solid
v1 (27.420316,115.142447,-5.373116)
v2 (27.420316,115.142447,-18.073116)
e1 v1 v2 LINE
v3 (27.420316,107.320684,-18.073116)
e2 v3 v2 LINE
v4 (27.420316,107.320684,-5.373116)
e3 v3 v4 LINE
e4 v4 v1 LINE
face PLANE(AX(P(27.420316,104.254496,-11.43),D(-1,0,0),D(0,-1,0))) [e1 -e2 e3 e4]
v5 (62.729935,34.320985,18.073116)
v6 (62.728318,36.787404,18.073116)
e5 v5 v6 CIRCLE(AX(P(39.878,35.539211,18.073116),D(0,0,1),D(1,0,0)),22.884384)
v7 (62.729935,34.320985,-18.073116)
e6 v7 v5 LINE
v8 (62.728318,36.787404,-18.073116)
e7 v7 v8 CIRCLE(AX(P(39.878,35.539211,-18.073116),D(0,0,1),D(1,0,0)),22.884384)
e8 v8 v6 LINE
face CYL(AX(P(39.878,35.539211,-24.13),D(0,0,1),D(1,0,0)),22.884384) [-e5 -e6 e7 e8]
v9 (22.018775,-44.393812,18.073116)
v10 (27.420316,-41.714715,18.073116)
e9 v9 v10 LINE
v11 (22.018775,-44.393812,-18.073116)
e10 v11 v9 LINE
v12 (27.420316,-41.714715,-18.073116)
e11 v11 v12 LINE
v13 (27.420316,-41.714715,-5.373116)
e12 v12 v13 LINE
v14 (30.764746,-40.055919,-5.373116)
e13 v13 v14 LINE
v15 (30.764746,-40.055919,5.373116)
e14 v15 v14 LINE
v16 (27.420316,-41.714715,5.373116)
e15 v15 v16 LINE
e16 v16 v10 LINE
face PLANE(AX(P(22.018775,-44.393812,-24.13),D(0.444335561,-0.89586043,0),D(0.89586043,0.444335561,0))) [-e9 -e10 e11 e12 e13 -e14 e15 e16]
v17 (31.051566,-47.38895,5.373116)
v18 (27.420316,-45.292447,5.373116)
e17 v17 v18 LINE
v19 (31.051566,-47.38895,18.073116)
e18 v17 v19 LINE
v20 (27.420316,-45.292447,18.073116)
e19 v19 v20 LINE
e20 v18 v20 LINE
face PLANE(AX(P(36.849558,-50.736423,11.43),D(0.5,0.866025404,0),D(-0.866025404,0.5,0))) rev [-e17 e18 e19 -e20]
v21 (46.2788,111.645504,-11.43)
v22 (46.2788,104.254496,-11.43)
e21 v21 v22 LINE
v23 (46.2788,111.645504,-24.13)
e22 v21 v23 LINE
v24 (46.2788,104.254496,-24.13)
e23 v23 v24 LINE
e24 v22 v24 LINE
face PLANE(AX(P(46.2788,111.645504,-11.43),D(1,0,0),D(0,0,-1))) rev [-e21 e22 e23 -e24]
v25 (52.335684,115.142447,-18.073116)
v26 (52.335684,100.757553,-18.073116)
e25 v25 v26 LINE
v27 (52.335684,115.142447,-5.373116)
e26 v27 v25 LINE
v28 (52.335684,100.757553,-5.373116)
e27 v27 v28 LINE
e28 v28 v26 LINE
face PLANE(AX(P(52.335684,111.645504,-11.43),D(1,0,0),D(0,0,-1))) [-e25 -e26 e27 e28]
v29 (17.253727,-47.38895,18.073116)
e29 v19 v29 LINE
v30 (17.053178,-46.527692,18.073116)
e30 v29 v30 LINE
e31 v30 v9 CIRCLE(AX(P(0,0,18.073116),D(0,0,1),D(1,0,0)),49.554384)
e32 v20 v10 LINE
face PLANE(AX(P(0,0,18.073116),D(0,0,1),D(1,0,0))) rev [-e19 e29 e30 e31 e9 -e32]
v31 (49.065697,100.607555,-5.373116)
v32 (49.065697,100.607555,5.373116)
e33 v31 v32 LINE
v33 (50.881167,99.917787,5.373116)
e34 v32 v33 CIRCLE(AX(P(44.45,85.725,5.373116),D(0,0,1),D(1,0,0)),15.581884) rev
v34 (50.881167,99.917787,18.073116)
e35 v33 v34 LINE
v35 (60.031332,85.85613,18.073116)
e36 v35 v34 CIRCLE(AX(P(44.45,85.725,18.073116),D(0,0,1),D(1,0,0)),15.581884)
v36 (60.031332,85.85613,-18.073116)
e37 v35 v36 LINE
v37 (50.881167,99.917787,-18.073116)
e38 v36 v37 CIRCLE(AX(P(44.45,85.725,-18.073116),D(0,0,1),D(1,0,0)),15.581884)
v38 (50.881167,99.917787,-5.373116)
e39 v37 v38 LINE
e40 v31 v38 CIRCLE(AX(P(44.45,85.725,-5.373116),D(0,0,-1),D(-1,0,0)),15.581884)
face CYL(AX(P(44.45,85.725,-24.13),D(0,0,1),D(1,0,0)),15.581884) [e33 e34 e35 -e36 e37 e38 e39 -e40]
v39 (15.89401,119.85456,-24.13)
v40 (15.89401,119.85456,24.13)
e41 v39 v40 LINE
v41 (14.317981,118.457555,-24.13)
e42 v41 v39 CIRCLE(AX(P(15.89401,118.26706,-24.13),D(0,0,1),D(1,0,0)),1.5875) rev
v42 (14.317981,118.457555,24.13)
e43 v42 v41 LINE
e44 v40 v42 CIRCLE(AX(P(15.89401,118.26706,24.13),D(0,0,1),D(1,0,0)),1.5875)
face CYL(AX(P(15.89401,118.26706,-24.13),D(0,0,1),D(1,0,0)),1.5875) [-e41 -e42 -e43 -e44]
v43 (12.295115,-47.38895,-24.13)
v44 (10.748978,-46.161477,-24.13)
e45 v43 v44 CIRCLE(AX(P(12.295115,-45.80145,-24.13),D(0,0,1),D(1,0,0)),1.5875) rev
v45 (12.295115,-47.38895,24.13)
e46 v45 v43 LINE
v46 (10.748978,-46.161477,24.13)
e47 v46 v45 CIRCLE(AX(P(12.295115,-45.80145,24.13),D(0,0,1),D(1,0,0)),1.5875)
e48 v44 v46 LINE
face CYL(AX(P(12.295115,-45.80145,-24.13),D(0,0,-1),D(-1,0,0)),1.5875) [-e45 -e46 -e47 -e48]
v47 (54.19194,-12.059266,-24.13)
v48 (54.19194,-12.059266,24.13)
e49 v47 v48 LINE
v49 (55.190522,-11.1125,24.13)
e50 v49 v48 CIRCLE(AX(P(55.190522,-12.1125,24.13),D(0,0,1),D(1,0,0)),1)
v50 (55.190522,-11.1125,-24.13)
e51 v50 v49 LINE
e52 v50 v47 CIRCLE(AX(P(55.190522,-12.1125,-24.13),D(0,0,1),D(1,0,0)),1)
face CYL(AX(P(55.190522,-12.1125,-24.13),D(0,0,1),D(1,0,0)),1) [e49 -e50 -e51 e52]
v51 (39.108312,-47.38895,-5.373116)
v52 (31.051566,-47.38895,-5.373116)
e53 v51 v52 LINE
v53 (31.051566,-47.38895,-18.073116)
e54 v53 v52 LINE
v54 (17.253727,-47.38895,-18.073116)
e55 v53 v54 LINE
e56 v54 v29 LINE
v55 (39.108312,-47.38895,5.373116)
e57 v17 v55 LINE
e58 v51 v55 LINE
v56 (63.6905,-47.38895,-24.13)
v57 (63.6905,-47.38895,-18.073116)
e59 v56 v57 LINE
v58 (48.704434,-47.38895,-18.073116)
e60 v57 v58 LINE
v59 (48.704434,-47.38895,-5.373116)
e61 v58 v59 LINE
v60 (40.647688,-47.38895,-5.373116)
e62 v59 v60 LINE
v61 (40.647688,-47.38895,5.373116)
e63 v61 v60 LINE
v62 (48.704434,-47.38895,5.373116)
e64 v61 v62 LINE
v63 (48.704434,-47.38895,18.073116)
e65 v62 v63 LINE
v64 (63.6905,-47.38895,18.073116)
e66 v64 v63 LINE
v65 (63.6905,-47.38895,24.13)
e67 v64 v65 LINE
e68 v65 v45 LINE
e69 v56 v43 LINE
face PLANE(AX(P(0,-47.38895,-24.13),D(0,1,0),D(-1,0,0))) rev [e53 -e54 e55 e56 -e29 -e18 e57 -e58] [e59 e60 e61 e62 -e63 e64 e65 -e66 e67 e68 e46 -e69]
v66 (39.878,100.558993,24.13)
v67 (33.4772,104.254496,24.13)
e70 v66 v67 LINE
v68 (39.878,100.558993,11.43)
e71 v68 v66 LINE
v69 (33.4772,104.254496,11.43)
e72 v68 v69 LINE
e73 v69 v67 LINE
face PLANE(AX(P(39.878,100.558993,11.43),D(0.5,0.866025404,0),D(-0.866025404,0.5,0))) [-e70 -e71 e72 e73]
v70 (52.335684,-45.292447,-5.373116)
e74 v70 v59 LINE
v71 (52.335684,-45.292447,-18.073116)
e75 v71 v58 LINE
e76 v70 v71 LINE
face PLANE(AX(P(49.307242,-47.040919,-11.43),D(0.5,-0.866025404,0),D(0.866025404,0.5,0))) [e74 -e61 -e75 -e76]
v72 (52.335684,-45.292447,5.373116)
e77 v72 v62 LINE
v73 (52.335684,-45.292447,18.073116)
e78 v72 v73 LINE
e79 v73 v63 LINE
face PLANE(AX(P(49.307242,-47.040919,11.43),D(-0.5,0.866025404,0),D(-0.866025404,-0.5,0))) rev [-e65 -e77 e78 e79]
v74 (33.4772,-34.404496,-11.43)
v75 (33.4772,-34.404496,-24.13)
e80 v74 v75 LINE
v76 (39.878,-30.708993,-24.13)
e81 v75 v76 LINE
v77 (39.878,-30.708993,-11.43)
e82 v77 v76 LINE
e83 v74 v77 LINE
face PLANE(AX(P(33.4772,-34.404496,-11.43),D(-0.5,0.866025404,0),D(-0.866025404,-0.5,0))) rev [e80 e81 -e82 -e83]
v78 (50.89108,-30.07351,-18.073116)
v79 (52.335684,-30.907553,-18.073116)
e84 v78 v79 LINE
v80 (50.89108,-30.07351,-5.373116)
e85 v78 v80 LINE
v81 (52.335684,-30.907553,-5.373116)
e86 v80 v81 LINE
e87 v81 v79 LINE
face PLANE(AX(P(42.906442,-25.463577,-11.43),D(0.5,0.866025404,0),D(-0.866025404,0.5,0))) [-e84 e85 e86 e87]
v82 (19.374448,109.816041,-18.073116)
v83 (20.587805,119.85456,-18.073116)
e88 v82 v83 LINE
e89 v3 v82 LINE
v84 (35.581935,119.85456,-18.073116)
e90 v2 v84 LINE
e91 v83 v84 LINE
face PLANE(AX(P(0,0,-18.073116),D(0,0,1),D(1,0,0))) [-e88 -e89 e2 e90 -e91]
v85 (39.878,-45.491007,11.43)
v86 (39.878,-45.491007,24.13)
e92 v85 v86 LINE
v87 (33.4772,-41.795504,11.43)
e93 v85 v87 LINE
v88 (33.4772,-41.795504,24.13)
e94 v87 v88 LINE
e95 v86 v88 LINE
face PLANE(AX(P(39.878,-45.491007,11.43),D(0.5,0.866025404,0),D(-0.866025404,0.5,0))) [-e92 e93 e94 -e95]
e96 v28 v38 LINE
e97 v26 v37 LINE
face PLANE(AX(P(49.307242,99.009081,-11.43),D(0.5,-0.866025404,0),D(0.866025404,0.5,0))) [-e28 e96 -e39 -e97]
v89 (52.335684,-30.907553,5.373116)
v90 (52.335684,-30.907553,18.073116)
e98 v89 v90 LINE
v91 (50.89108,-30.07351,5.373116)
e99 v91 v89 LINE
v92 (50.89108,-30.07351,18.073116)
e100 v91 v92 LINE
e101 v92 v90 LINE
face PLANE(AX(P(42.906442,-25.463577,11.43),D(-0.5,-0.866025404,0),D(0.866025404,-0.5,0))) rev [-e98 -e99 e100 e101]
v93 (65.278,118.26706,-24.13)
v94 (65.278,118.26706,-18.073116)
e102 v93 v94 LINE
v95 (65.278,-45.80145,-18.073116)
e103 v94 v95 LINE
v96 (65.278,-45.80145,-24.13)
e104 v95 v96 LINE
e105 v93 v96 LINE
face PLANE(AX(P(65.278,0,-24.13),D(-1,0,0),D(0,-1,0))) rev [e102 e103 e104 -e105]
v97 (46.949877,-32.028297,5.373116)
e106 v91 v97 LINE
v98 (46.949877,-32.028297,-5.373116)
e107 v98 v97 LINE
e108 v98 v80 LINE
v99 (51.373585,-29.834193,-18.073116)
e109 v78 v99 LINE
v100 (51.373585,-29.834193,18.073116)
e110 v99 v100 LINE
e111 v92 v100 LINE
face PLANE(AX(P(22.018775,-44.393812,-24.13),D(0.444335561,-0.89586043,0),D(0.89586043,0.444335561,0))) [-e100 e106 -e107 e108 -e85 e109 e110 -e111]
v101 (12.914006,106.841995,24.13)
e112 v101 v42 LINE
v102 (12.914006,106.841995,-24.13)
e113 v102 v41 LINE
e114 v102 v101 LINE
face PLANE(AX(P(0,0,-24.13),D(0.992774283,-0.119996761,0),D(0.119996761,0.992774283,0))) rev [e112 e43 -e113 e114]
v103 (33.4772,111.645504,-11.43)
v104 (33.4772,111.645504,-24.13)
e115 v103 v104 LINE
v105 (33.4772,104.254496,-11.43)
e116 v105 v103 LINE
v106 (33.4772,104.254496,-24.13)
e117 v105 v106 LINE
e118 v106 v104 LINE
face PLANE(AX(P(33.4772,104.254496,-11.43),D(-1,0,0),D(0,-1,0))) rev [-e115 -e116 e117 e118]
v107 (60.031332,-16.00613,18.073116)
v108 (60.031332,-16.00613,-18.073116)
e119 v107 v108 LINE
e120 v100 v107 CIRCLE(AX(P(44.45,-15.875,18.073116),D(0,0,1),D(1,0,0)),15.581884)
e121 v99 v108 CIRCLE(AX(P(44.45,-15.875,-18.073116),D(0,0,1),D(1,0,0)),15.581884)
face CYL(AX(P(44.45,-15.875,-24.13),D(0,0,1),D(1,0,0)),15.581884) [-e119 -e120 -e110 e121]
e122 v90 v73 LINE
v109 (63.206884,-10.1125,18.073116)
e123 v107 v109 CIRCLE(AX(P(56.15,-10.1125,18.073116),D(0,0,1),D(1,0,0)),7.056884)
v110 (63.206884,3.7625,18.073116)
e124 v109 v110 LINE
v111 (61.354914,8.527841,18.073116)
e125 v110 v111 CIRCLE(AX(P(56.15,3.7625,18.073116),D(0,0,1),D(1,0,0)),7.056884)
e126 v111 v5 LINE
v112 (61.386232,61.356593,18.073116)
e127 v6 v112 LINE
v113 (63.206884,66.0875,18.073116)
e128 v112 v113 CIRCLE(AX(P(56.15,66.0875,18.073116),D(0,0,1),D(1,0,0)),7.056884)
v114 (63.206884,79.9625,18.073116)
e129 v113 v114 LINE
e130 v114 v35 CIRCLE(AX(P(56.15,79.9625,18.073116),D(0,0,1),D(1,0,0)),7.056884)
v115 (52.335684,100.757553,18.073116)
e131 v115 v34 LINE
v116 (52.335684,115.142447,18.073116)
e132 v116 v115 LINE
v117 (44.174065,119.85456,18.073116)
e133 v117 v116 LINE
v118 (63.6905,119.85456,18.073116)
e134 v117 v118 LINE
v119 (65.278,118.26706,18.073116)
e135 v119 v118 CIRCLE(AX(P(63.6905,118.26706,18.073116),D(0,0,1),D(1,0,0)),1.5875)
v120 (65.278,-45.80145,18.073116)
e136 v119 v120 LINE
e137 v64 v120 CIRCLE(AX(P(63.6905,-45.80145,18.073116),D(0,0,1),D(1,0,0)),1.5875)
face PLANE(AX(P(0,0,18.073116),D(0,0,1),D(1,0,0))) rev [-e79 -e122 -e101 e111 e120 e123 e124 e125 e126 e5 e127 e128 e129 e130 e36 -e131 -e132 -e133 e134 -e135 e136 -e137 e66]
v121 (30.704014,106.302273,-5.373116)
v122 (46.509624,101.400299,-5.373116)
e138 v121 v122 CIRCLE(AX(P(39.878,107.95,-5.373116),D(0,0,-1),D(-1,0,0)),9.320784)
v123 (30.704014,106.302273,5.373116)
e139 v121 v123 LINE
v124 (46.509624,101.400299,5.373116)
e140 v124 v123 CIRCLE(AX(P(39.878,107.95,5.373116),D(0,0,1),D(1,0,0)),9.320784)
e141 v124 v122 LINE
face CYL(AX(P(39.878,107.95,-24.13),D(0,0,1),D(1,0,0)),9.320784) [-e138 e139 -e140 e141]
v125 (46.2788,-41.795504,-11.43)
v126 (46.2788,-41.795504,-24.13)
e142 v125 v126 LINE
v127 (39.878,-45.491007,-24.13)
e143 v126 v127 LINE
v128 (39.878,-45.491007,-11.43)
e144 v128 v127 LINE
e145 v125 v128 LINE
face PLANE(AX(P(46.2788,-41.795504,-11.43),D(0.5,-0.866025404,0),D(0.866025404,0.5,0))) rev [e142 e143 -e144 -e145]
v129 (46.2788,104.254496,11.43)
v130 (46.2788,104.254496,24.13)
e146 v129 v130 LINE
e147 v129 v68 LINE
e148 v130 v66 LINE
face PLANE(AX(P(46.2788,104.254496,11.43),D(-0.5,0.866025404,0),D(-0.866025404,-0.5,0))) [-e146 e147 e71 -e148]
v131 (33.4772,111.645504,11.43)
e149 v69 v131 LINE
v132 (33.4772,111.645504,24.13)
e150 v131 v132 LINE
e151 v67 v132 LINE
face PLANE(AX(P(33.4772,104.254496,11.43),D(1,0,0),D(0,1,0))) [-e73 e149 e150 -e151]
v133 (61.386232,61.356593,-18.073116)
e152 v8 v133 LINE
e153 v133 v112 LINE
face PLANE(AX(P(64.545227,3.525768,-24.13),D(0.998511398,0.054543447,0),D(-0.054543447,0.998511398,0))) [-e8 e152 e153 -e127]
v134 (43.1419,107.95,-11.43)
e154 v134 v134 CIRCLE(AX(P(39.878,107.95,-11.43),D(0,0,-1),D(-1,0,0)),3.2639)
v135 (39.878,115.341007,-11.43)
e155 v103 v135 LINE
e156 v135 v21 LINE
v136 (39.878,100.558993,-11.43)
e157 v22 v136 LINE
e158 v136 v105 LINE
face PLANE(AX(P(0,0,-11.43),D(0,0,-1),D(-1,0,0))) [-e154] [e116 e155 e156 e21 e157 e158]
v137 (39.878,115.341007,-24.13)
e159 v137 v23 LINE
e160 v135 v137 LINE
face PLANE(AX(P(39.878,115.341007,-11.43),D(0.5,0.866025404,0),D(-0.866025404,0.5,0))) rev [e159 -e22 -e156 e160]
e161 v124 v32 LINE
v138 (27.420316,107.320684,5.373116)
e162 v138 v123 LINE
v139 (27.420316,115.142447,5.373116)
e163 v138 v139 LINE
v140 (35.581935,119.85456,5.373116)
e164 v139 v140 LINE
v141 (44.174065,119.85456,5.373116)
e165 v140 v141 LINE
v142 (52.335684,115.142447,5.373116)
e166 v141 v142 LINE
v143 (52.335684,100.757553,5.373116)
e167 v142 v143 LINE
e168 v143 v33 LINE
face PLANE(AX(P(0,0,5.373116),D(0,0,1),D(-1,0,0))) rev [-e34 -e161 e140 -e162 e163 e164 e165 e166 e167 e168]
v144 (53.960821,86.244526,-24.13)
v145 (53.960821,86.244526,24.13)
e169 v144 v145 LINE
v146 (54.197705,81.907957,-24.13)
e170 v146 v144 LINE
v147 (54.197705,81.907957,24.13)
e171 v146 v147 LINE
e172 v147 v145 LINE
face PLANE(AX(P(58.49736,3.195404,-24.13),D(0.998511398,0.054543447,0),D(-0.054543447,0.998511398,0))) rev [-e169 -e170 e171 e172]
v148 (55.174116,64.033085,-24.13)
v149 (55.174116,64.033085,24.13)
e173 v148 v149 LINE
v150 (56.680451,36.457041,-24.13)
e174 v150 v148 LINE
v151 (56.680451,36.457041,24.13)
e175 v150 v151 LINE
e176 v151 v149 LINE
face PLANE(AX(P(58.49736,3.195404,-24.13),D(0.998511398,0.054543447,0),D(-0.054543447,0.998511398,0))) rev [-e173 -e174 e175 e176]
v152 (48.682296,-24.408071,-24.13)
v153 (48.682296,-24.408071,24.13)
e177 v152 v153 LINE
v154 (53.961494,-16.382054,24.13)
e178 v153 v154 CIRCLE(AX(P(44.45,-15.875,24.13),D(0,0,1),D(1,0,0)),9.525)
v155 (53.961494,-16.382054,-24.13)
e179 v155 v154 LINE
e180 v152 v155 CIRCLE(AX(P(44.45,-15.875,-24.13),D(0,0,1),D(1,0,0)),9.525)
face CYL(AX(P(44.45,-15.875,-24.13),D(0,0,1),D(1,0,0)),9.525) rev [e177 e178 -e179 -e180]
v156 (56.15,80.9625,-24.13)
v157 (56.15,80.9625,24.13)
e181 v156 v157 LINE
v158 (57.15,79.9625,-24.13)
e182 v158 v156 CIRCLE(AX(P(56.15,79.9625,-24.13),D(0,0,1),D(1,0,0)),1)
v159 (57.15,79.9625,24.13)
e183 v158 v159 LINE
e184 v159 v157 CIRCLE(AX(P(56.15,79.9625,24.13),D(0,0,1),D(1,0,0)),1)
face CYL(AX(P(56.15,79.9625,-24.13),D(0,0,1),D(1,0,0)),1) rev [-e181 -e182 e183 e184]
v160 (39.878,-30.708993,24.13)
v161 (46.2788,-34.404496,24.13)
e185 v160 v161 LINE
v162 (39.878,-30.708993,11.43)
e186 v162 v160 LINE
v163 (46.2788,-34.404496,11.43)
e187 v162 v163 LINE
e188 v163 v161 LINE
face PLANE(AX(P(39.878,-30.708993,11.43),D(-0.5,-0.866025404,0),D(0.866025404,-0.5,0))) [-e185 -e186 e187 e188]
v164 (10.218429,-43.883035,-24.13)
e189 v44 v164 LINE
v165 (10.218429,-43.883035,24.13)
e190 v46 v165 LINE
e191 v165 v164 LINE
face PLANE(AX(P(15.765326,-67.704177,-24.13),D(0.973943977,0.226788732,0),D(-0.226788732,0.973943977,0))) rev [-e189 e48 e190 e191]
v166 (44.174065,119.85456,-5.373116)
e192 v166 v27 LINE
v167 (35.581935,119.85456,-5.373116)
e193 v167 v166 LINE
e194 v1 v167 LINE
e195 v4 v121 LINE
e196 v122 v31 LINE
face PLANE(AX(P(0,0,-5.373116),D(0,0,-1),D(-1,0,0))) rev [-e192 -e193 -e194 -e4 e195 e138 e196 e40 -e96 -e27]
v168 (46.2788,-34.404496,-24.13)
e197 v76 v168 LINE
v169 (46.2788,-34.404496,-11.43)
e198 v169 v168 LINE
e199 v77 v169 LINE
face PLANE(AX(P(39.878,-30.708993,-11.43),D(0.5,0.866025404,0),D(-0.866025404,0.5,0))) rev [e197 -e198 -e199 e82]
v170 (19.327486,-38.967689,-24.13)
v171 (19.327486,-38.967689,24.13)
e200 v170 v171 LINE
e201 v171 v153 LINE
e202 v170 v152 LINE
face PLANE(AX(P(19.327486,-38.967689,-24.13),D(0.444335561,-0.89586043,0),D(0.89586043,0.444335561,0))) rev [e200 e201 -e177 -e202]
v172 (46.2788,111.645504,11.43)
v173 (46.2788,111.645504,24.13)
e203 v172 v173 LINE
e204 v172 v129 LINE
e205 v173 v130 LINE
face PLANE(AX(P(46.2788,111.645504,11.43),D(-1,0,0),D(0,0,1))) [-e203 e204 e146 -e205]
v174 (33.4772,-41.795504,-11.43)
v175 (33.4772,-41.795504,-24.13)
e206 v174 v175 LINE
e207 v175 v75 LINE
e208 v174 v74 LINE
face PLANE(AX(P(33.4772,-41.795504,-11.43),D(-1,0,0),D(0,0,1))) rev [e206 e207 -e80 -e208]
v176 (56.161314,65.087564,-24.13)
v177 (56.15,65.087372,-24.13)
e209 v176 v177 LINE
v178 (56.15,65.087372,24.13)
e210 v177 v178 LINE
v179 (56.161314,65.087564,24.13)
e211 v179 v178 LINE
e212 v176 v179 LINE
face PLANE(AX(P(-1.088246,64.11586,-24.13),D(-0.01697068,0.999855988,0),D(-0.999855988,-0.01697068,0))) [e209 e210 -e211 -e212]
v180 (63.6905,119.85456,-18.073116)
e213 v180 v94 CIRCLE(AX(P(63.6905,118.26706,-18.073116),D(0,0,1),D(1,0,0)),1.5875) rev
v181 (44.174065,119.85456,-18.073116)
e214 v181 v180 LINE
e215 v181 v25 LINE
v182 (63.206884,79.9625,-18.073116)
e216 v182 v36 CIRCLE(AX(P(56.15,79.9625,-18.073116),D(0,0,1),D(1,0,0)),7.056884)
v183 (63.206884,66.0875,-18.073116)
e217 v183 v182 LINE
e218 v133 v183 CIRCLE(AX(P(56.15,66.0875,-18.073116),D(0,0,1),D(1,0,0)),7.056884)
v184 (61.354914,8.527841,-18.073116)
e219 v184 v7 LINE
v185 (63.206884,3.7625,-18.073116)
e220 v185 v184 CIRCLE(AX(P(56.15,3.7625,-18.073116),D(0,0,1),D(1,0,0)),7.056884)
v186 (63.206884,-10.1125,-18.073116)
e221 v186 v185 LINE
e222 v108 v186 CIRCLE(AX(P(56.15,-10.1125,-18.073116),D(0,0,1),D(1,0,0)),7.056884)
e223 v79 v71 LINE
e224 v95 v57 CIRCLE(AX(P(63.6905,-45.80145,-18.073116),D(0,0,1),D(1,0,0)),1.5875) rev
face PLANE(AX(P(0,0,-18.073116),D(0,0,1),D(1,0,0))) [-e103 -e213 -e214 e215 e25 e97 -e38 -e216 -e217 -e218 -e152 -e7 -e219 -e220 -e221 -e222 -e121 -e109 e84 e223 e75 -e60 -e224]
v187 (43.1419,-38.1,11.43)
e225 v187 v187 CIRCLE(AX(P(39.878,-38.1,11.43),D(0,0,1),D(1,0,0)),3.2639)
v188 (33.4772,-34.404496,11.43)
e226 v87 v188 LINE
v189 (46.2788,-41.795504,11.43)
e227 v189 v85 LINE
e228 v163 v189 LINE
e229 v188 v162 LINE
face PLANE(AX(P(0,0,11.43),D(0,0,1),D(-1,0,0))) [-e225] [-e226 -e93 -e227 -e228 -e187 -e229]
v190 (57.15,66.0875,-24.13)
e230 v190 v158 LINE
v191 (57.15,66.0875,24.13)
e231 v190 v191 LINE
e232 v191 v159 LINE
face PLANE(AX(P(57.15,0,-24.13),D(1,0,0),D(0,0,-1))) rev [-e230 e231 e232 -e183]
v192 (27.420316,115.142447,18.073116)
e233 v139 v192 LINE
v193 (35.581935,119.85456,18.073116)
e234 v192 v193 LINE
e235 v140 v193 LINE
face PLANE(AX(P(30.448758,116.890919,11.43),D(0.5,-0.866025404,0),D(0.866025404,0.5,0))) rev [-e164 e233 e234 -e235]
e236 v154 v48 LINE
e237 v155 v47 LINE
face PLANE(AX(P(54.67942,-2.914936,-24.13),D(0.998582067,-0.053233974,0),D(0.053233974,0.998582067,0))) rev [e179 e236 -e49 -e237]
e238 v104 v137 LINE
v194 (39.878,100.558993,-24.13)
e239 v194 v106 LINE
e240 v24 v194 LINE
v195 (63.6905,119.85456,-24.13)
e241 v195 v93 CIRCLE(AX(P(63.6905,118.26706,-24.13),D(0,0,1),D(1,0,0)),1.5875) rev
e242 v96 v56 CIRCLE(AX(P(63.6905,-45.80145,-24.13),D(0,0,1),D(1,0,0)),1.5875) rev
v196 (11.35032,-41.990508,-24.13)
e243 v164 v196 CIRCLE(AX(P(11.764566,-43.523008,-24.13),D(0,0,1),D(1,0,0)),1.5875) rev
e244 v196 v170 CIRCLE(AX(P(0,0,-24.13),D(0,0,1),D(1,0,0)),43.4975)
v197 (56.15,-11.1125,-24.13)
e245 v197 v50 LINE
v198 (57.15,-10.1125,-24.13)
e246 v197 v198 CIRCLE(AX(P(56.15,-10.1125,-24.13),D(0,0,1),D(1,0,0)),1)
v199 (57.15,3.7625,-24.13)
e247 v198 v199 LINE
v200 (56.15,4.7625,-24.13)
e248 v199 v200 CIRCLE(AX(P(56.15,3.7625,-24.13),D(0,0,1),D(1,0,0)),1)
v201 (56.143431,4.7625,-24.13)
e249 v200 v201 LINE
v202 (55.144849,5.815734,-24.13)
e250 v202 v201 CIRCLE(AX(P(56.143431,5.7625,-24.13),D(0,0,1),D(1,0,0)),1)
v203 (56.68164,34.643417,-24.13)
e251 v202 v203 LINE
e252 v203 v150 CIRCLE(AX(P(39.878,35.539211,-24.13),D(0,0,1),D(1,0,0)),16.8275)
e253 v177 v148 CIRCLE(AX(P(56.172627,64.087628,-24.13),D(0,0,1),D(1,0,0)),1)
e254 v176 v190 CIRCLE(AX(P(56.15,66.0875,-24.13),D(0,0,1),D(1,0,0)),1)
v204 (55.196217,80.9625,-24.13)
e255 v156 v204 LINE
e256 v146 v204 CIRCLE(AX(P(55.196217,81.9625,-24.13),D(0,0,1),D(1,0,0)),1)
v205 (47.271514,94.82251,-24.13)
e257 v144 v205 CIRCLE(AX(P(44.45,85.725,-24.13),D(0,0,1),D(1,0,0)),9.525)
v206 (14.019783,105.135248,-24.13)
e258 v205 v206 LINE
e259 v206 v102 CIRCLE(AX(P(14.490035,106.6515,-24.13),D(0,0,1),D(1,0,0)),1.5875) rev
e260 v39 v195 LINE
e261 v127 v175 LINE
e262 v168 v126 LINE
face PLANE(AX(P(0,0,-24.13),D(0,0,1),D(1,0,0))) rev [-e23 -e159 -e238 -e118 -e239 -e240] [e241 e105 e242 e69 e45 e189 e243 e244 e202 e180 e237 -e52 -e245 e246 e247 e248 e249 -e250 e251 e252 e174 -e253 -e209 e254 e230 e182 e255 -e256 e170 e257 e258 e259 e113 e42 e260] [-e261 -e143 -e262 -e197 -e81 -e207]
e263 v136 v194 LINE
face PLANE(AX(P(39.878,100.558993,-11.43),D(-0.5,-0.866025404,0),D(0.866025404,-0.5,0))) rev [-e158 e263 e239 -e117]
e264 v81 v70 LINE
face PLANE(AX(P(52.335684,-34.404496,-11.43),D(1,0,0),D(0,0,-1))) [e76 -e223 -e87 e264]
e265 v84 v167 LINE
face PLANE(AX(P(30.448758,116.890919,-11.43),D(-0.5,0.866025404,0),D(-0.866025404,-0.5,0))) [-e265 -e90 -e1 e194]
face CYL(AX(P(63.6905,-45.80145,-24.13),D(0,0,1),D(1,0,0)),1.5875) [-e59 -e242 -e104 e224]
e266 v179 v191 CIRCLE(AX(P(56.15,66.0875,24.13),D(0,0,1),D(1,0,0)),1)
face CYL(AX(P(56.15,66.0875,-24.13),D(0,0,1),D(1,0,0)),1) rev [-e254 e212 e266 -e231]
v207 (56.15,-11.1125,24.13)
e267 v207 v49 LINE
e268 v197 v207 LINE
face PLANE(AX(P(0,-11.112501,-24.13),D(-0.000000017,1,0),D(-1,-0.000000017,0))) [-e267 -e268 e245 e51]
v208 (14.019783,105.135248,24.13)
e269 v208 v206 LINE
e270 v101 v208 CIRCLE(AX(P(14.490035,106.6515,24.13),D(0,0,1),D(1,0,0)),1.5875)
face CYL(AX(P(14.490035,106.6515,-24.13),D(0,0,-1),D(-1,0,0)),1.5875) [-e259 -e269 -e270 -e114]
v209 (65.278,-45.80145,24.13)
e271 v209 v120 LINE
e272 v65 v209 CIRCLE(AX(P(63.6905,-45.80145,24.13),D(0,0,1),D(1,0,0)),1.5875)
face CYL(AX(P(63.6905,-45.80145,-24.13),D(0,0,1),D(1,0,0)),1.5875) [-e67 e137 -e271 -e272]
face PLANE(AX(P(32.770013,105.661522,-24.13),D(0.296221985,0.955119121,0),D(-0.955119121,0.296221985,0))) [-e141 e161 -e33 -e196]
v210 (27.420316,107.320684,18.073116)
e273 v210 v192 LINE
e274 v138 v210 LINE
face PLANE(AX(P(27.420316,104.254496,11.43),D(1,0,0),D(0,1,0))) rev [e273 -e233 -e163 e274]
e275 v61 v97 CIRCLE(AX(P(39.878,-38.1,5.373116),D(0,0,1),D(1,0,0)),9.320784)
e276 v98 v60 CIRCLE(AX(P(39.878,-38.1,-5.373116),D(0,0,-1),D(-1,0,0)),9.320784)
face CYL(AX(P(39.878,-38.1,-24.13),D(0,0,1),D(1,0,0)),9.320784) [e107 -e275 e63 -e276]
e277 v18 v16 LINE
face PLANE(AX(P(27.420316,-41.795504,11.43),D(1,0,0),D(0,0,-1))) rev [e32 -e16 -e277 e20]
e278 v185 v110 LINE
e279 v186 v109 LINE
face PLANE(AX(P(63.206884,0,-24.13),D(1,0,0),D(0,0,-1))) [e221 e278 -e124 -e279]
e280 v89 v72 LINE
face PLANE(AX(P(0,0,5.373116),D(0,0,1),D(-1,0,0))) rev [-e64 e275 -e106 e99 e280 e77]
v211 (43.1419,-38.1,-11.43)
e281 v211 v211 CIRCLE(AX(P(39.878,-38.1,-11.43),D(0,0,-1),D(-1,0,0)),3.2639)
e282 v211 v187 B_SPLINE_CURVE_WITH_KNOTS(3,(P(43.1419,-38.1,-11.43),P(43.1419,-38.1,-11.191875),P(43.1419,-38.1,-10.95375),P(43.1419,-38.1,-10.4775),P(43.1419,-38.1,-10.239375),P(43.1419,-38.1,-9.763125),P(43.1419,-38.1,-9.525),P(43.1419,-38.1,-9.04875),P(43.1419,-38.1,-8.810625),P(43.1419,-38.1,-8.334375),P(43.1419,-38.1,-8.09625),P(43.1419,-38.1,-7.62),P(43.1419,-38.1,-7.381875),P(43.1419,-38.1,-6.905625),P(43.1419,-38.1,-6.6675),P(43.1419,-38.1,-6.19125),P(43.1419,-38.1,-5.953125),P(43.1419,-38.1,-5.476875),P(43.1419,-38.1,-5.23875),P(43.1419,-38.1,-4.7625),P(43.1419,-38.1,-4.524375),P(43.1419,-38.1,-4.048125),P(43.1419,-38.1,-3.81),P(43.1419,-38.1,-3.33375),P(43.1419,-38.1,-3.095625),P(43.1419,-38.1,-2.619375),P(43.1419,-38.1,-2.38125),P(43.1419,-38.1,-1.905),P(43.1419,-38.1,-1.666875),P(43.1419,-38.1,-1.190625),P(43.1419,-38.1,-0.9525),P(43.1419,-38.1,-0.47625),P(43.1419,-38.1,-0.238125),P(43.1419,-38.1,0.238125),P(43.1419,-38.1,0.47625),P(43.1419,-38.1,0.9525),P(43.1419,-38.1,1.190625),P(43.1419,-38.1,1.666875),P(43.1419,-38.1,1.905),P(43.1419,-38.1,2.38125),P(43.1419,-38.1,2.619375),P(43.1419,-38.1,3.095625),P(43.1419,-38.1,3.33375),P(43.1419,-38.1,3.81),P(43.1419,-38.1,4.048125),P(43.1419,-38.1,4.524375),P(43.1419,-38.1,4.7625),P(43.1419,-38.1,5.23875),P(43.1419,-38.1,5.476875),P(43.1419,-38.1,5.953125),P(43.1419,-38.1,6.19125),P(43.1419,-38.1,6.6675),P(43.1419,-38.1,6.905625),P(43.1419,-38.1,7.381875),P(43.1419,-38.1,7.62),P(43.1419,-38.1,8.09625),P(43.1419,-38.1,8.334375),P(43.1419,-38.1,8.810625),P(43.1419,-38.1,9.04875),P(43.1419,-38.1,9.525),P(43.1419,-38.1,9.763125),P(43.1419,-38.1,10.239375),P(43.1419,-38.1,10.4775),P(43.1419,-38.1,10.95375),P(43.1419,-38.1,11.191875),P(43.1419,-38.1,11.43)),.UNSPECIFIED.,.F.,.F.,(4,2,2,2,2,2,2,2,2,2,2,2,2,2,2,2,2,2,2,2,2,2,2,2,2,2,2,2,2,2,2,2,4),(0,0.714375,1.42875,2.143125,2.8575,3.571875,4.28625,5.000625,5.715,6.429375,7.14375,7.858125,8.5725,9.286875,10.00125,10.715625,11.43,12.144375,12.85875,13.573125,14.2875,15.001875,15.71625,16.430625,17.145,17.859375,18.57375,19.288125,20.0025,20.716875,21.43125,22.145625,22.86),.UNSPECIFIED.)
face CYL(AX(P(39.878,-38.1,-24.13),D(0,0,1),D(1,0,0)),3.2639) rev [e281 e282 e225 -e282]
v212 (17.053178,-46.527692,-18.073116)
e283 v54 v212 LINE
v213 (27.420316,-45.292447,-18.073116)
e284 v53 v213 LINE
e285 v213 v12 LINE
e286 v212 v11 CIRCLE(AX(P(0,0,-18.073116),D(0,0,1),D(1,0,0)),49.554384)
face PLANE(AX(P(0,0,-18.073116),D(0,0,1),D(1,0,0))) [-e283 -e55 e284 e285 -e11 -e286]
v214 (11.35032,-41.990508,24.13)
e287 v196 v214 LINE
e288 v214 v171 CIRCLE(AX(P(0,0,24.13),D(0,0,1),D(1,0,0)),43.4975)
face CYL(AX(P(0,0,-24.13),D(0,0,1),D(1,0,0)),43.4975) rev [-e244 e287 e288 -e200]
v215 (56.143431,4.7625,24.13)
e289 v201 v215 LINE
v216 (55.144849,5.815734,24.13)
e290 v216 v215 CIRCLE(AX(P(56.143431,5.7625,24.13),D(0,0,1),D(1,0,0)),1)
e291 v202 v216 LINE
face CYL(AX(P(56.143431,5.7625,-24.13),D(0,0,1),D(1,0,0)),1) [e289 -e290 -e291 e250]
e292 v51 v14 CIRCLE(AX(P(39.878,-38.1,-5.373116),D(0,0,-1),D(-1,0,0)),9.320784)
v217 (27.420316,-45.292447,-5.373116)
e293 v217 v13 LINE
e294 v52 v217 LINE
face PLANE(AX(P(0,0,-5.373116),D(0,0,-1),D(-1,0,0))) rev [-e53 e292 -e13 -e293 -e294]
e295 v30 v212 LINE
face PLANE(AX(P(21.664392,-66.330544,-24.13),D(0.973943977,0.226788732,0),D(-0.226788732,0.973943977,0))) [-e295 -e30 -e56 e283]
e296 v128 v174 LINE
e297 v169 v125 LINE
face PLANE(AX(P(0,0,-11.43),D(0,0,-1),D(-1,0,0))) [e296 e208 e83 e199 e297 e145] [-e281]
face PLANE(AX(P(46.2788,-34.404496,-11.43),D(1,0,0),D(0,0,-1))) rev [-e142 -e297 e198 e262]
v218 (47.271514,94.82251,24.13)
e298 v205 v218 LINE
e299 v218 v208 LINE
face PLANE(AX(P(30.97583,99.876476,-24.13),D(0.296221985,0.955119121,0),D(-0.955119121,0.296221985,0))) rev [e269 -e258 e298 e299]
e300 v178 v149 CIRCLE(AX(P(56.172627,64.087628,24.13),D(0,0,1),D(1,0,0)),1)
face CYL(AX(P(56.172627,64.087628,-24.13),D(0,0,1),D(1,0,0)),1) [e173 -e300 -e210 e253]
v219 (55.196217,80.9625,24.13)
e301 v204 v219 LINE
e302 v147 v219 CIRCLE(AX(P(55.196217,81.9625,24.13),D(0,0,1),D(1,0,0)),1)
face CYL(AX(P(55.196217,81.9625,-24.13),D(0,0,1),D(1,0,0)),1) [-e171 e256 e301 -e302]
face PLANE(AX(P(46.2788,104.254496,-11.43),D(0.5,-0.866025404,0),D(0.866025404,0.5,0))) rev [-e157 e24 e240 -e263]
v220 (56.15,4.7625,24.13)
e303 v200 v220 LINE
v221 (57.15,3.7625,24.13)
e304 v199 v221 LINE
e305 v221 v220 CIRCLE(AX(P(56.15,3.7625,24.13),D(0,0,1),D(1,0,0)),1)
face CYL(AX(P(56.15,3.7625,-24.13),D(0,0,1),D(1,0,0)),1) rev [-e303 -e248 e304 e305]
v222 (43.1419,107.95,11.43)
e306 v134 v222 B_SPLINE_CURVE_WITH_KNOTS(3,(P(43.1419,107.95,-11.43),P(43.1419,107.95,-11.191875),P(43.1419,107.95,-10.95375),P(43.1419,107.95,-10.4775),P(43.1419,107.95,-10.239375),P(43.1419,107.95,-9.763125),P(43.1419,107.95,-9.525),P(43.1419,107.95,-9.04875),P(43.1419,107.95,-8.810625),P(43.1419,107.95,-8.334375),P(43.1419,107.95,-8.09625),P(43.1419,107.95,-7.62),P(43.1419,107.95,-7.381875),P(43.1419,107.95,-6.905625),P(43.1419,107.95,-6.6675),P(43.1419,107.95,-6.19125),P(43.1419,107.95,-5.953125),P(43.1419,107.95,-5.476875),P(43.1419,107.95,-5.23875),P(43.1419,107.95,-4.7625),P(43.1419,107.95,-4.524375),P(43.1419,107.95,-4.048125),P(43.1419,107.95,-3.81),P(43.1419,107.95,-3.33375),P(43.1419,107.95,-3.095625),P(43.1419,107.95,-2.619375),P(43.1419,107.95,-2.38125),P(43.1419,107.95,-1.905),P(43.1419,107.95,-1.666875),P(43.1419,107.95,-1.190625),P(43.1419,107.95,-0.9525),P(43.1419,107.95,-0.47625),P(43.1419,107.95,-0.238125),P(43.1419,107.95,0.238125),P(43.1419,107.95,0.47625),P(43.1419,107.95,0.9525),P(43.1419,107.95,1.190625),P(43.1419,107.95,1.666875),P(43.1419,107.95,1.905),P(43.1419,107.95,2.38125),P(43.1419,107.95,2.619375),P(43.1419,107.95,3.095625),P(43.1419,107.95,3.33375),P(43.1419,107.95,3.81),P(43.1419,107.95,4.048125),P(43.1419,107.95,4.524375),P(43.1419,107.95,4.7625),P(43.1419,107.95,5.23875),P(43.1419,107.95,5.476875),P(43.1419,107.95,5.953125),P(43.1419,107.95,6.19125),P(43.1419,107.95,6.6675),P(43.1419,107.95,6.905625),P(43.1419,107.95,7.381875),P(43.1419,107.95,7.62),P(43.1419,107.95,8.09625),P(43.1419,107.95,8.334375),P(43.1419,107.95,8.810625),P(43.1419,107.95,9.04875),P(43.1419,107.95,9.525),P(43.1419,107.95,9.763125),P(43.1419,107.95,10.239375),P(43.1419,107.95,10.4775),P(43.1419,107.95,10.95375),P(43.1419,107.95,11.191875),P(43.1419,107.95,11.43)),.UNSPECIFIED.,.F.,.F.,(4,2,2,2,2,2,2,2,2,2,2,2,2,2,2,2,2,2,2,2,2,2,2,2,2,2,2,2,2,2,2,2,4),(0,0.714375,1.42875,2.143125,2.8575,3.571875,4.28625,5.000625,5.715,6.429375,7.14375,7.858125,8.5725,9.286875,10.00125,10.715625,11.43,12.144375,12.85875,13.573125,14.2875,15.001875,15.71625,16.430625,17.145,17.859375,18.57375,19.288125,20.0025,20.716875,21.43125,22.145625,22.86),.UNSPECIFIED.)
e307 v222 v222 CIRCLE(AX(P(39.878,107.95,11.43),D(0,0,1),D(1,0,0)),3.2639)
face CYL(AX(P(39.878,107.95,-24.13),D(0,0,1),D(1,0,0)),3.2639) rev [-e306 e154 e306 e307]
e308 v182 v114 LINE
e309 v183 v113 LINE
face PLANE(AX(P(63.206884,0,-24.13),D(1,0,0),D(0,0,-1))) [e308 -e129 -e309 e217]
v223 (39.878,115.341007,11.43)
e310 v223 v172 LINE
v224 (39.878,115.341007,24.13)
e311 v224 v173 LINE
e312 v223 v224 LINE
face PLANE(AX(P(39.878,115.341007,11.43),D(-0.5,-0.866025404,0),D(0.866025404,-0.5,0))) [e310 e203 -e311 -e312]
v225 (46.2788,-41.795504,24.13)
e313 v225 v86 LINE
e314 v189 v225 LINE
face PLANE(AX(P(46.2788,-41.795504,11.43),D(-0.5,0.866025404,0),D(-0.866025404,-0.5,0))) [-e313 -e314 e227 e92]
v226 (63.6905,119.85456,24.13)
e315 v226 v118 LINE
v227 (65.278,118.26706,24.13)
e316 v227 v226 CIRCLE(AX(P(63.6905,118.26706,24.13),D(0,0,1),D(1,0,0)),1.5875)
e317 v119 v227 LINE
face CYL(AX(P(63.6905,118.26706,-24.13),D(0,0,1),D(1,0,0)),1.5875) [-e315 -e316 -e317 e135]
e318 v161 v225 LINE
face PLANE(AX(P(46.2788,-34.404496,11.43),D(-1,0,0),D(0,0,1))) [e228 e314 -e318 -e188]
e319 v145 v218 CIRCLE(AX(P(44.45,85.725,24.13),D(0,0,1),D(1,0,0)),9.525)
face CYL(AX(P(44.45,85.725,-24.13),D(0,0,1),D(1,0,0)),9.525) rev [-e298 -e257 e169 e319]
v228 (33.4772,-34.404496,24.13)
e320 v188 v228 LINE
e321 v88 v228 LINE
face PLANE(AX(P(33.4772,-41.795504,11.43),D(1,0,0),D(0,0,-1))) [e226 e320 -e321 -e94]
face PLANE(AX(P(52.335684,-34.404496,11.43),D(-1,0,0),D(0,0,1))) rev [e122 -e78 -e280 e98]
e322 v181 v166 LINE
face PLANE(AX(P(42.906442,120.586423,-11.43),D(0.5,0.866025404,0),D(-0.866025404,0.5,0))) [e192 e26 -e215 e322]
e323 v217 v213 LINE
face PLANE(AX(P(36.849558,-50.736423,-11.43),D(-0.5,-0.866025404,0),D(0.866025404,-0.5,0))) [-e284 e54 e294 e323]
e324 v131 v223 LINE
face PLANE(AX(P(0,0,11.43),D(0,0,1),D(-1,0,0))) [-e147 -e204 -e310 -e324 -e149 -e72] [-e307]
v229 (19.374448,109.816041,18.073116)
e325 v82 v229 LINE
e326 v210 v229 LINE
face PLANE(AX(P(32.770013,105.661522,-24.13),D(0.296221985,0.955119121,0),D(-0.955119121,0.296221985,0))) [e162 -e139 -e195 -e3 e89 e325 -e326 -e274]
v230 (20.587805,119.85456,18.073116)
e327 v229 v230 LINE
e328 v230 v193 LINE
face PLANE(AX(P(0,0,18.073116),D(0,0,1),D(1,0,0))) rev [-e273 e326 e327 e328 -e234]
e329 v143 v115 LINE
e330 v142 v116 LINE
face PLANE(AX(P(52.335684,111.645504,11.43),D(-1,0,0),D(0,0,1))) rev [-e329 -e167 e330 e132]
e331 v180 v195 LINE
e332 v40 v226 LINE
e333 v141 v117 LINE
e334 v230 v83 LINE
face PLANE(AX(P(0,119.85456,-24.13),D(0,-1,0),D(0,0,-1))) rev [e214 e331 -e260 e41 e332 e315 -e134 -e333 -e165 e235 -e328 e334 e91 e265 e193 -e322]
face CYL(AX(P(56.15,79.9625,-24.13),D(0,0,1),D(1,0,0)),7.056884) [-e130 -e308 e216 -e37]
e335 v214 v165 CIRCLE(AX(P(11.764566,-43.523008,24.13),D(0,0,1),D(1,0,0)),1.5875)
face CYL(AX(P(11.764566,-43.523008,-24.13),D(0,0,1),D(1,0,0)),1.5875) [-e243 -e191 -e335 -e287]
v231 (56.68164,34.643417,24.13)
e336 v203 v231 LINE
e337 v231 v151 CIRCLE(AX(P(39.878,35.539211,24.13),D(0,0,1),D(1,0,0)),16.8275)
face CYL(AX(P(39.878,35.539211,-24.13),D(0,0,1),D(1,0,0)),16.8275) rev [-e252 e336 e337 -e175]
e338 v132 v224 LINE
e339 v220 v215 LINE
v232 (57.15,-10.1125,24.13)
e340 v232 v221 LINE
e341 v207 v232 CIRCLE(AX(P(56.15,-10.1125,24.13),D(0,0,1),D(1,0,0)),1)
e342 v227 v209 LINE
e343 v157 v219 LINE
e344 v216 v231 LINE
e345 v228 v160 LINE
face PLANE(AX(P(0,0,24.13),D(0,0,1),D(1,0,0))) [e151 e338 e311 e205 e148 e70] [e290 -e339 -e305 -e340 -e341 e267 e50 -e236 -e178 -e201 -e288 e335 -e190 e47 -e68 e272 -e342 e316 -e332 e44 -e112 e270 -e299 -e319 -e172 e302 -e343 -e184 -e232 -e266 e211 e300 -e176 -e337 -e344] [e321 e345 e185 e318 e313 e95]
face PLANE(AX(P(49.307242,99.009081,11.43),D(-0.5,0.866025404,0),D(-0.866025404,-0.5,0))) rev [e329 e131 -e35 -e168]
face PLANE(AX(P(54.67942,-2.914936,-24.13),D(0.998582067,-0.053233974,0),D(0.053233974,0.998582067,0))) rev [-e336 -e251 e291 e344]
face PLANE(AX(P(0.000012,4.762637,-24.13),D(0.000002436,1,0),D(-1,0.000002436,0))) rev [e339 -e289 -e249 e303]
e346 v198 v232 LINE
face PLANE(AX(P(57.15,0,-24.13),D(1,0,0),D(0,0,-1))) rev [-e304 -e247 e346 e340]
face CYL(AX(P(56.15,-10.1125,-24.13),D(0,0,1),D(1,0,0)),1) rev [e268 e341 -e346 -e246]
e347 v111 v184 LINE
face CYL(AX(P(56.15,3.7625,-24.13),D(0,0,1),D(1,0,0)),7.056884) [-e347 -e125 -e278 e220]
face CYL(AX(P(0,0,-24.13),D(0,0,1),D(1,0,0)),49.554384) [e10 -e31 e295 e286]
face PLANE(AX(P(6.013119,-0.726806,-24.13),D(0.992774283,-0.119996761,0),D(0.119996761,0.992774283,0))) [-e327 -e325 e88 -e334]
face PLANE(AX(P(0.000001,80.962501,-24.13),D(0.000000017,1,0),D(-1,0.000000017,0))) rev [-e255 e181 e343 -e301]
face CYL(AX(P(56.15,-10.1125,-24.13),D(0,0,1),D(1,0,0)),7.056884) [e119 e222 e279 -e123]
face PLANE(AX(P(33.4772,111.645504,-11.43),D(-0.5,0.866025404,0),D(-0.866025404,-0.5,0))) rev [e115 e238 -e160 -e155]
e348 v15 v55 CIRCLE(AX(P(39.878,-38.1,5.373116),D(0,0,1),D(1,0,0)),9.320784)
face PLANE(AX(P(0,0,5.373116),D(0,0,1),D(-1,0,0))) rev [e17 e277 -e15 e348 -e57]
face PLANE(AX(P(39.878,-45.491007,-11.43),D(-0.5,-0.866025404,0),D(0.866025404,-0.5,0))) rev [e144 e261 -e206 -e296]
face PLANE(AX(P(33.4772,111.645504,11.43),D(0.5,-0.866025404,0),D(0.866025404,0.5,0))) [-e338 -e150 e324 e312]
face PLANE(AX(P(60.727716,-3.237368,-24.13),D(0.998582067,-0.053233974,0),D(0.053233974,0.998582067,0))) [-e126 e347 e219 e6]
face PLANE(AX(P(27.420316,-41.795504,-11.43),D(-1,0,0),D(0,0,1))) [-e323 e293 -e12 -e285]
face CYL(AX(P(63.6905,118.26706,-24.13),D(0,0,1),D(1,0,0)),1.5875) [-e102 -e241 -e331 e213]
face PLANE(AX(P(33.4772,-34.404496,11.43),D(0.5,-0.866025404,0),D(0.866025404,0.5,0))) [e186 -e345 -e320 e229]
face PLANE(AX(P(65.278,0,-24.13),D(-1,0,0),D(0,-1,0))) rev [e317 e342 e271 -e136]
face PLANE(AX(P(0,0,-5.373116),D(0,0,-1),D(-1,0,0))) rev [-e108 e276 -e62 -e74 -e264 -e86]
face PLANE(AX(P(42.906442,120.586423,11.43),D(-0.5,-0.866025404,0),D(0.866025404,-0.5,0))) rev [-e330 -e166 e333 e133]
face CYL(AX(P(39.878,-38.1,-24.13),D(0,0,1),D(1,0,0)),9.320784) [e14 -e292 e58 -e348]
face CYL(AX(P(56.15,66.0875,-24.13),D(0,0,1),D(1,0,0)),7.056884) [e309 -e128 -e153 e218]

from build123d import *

# Parameters (mm, degrees)
BOSS_EXTRUDE1_DEPTH     = 24.13
CUT_EXTRUDE1_DEPTH      = 139.595056638
CUT_EXTRUDE1_DEPTH_BACK = 139.595056638
FILLET1_R               = 1.5875
CUT_EXTRUDE2_DEPTH      = 12.7
CUT_EXTRUDE3_DEPTH      = 139.595056638
CUT_EXTRUDE3_DEPTH_BACK = 139.595056638
SKETCH4_R               = 3.2639
SHELL1_START            = -18.073116
SHELL1_DEPTH            = 36.146232
SHELL1_START_2          = -5.373116
SHELL1_2_DEPTH          = 10.746232


# Read off the part's stored shape, not the designer's step: Shell1
with BuildPart() as part:
    # Sketch1 → Boss-Extrude1 (new, symmetric)
    with BuildSketch(Plane.XY):
        with BuildLine():
            Line((56.161313585, 65.087564001), (56.15, 65.087371974))
            ThreePointArc((56.15, 65.087371974), (55.438759683, 64.766920639), (55.174115771, 64.033084522))
            Line((55.174115771, 64.033084522), (56.680450554, 36.457041128))
            ThreePointArc((56.680450554, 36.457041128), (56.705496383, 35.550244887), (56.681639728, 34.643416582))
            Line((56.681639728, 34.643416582), (55.144848554, 5.815734008))
            ThreePointArc((55.144848554, 5.815734008), (55.417746823, 5.074471658), (56.143430652, 4.7625))
            Line((56.143430652, 4.7625), (56.149999968, 4.762499984))
            ThreePointArc((56.149999968, 4.762499984), (56.857106771, 4.469606766), (57.15, 3.762499968))
            Line((57.15, 3.762499968), (57.15, -10.112499968))
            ThreePointArc((57.15, -10.112499968), (56.857106771, -10.819606766), (56.149999968, -11.112499984))
            Line((56.149999968, -11.112499984), (55.190522202, -11.1125))
            ThreePointArc((55.190522202, -11.1125), (54.502493828, -11.386816202), (54.191940103, -12.059266056))
            Line((54.191940103, -12.059266056), (53.961494186, -16.382053603))
            ThreePointArc((53.961494186, -16.382053603), (52.407837698, -21.109352316), (48.682296217, -24.408070592))
            Line((48.682296217, -24.408070592), (19.327486058, -38.967689038))
            ThreePointArc((19.327486058, -38.967689038), (0, -43.4975), (-19.327486058, -38.967689038))
            Line((-19.327486058, -38.967689038), (-19.327486058, -47.388950103))
            Line((-19.327486058, -47.388950103), (65.278, -47.388950103))
            Line((65.278, -47.388950103), (65.278, 119.854559949))
            Line((65.278, 119.854559949), (-4.702524006, 119.854559949))
            Line((-4.702524006, 119.854559949), (-4.702524006, 108.02491605))
            ThreePointArc((-4.702524006, 108.02491605), (0, 108.7374), (4.702524006, 108.02491605))
            Line((4.702524006, 108.02491605), (47.271514403, 94.82250963))
            ThreePointArc((47.271514403, 94.82250963), (51.961130003, 91.582350175), (53.960821068, 86.244526329))
            Line((53.960821068, 86.244526329), (54.197705155, 81.907956584))
            ThreePointArc((54.197705155, 81.907956584), (54.508664182, 81.236365226), (55.196216585, 80.9625))
            Line((55.196216585, 80.9625), (56.149999984, 80.962499984))
            ThreePointArc((56.149999984, 80.962499984), (56.857106777, 80.669606761), (57.15, 79.962499968))
            Line((57.15, 79.962499968), (57.15, 66.087500032))
            ThreePointArc((57.15, 66.087500032), (56.8610955, 65.384404568), (56.161313585, 65.087564001))
        make_face()
    extrude(amount=BOSS_EXTRUDE1_DEPTH, both=True)

    # Sketch2 → Cut-Extrude1 (cut, two sides: drawn at the far end of the back side and taken through both)
    with BuildSketch(Plane.XY.offset(-CUT_EXTRUDE1_DEPTH_BACK)):
        Polygon((0, 0), (16.649604997, 137.747881839), (-33.336773011, 132.313158031), (-32.126746787, -67.704176811), (15.765326083, -67.704176811), align=None)
    extrude(amount=CUT_EXTRUDE1_DEPTH + CUT_EXTRUDE1_DEPTH_BACK, mode=Mode.SUBTRACT)

    # Fillet1
    fillet1_edges = [part.edges().sort_by_distance(p)[0] for p in [
        (65.278, 119.854559949, 0),
        (65.278, -47.388950103, 0),
        (11.034802966, -47.388950103, 0),
        (9.864742858, -42.364128158, 0),
        (12.755119811, 105.527472687, 0),
        (14.486836775, 119.854559949, 0),
    ]]
    fillet(fillet1_edges, radius=FILLET1_R)

    # Sketch3 → Cut-Extrude2 (cut)
    with BuildSketch(Plane(origin=(0, 0, -24.13), x_dir=(-1, 0, 0), z_dir=(0, 0, -1))):
        Polygon((-39.878, -30.708992794), (-46.2788, -34.404496397), (-46.2788, -41.795503603), (-39.878, -45.491007206), (-33.4772, -41.795503603), (-33.4772, -34.404496397), align=None)
        Polygon((-33.4772, 111.645503603), (-39.878, 115.341007206), (-46.2788, 111.645503603), (-46.2788, 104.254496397), (-39.878, 100.558992794), (-33.4772, 104.254496397), align=None)
    cut_extrude2 = extrude(amount=-CUT_EXTRUDE2_DEPTH, mode=Mode.SUBTRACT)

    # Mirror1: Cut-Extrude2 across plane
    add(cut_extrude2.mirror(Plane.XY), mode=Mode.SUBTRACT)

    # Sketch4 → Cut-Extrude3 (cut, two sides: drawn at the far end of the back side and taken through both)
    with BuildSketch(Plane.XY.offset(-CUT_EXTRUDE3_DEPTH_BACK)):
        with Locations((39.878, 107.95)):
            Circle(SKETCH4_R)
        with Locations((39.878, -38.1)):
            Circle(SKETCH4_R)
    extrude(amount=CUT_EXTRUDE3_DEPTH + CUT_EXTRUDE3_DEPTH_BACK, mode=Mode.SUBTRACT)

    # Shell1 outline → Shell1 (cut)
    with BuildSketch(Plane.XY.offset(SHELL1_START)):
        Polygon((19.374447508, 109.816041015), (27.420316, 107.32068407), (27.420316, 115.142447211), (35.581934673, 119.854559949), (20.587804641, 119.854559949), align=None)
        with BuildLine():
            Line((52.335684, 100.757552789), (50.881166896, 99.917786948))
            ThreePointArc((50.881166896, 99.917786948), (57.51024809, 94.223530979), (60.031332227, 85.856129752))
            ThreePointArc((60.031332227, 85.856129752), (62.362476281, 83.309849707), (63.206884, 79.962499968))
            Line((63.206884, 79.962499968), (63.206884008, 66.087500032))
            ThreePointArc((63.206884008, 66.087500032), (62.736011515, 63.552926254), (61.386232226, 61.356592716))
            Line((61.386232226, 61.356592716), (62.728318266, 36.787404457))
            ThreePointArc((62.728318266, 36.787404457), (62.762379081, 35.55421632), (62.729935471, 34.320984576))
            Line((62.729935471, 34.320984576), (61.354914269, 8.527841436))
            ThreePointArc((61.354914269, 8.527841436), (62.727616894, 6.318780038), (63.206884, 3.762499968))
            Line((63.206884, 3.762499968), (63.206884, -10.112499968))
            ThreePointArc((63.206884, -10.112499968), (62.362476281, -13.459849707), (60.031332227, -16.006129752))
            ThreePointArc((60.031332227, -16.006129752), (57.656879346, -24.143823794), (51.373585166, -29.834193295))
            Line((51.373585166, -29.834193295), (50.891079569, -30.073510032))
            Line((50.891079569, -30.073510032), (52.335684, -30.907552789))
            Line((52.335684, -30.907552789), (52.335684, -45.292447211))
            Line((52.335684, -45.292447211), (48.704434473, -47.388950103))
            Line((48.704434473, -47.388950103), (63.6905, -47.388950103))
            ThreePointArc((63.6905, -47.388950103), (64.813032015, -46.923982118), (65.278, -45.801450103))
            Line((65.278, -45.801450103), (65.278, 118.267059949))
            ThreePointArc((65.278, 118.267059949), (64.813032015, 119.389591964), (63.6905, 119.854559949))
            Line((63.6905, 119.854559949), (44.174065327, 119.854559949))
            Line((44.174065327, 119.854559949), (52.335684, 115.142447211))
            Line((52.335684, 115.142447211), (52.335684, 100.757552789))
        make_face()
        with BuildLine():
            Line((17.253727402, -47.388950103), (31.051565527, -47.388950103))
            Line((31.051565527, -47.388950103), (27.420316, -45.292447211))
            Line((27.420316, -45.292447211), (27.420316, -41.714715011))
            Line((27.420316, -41.714715011), (22.018775007, -44.39381174))
            ThreePointArc((22.018775007, -44.39381174), (19.565089882, -45.528499114), (17.053178169, -46.527691625))
            Line((17.053178169, -46.527691625), (17.253727402, -47.388950103))
        make_face()
    extrude(amount=SHELL1_DEPTH, mode=Mode.SUBTRACT)

    # Shell1 2 outline → Shell1 2 (cut)
    with BuildSketch(Plane.XY.offset(SHELL1_START_2)):
        with BuildLine():
            Line((31.051565527, -47.388950103), (39.108311519, -47.388950103))
            ThreePointArc((39.108311519, -47.388950103), (33.724832418, -45.101110132), (30.764746274, -40.055919453))
            Line((30.764746274, -40.055919453), (27.420316, -41.714715011))
            Line((27.420316, -41.714715011), (27.420316, -45.292447211))
            Line((27.420316, -45.292447211), (31.051565527, -47.388950103))
        make_face()
        with BuildLine():
            ThreePointArc((30.704014451, 106.302273224), (42.639021135, 116.852459024), (46.509623897, 101.40029933))
            Line((46.509623897, 101.40029933), (49.065696603, 100.607555354))
            ThreePointArc((49.065696603, 100.607555354), (49.984188595, 100.290983166), (50.881166896, 99.917786948))
            Line((50.881166896, 99.917786948), (52.335684, 100.757552789))
            Line((52.335684, 100.757552789), (52.335684, 115.142447211))
            Line((52.335684, 115.142447211), (44.174065327, 119.854559949))
            Line((44.174065327, 119.854559949), (35.581934673, 119.854559949))
            Line((35.581934673, 119.854559949), (27.420316, 115.142447211))
            Line((27.420316, 115.142447211), (27.420316, 107.32068407))
            Line((27.420316, 107.32068407), (30.704014451, 106.302273224))
        make_face()
        with BuildLine():
            Line((40.647688481, -47.388950103), (48.704434473, -47.388950103))
            Line((48.704434473, -47.388950103), (52.335684, -45.292447211))
            Line((52.335684, -45.292447211), (52.335684, -30.907552789))
            Line((52.335684, -30.907552789), (50.891079569, -30.073510032))
            Line((50.891079569, -30.073510032), (46.949876749, -32.028297304))
            ThreePointArc((46.949876749, -32.028297304), (48.501221551, -41.637946362), (40.647688481, -47.388950103))
        make_face()
    extrude(amount=SHELL1_2_DEPTH, mode=Mode.SUBTRACT)


solid = part.part
